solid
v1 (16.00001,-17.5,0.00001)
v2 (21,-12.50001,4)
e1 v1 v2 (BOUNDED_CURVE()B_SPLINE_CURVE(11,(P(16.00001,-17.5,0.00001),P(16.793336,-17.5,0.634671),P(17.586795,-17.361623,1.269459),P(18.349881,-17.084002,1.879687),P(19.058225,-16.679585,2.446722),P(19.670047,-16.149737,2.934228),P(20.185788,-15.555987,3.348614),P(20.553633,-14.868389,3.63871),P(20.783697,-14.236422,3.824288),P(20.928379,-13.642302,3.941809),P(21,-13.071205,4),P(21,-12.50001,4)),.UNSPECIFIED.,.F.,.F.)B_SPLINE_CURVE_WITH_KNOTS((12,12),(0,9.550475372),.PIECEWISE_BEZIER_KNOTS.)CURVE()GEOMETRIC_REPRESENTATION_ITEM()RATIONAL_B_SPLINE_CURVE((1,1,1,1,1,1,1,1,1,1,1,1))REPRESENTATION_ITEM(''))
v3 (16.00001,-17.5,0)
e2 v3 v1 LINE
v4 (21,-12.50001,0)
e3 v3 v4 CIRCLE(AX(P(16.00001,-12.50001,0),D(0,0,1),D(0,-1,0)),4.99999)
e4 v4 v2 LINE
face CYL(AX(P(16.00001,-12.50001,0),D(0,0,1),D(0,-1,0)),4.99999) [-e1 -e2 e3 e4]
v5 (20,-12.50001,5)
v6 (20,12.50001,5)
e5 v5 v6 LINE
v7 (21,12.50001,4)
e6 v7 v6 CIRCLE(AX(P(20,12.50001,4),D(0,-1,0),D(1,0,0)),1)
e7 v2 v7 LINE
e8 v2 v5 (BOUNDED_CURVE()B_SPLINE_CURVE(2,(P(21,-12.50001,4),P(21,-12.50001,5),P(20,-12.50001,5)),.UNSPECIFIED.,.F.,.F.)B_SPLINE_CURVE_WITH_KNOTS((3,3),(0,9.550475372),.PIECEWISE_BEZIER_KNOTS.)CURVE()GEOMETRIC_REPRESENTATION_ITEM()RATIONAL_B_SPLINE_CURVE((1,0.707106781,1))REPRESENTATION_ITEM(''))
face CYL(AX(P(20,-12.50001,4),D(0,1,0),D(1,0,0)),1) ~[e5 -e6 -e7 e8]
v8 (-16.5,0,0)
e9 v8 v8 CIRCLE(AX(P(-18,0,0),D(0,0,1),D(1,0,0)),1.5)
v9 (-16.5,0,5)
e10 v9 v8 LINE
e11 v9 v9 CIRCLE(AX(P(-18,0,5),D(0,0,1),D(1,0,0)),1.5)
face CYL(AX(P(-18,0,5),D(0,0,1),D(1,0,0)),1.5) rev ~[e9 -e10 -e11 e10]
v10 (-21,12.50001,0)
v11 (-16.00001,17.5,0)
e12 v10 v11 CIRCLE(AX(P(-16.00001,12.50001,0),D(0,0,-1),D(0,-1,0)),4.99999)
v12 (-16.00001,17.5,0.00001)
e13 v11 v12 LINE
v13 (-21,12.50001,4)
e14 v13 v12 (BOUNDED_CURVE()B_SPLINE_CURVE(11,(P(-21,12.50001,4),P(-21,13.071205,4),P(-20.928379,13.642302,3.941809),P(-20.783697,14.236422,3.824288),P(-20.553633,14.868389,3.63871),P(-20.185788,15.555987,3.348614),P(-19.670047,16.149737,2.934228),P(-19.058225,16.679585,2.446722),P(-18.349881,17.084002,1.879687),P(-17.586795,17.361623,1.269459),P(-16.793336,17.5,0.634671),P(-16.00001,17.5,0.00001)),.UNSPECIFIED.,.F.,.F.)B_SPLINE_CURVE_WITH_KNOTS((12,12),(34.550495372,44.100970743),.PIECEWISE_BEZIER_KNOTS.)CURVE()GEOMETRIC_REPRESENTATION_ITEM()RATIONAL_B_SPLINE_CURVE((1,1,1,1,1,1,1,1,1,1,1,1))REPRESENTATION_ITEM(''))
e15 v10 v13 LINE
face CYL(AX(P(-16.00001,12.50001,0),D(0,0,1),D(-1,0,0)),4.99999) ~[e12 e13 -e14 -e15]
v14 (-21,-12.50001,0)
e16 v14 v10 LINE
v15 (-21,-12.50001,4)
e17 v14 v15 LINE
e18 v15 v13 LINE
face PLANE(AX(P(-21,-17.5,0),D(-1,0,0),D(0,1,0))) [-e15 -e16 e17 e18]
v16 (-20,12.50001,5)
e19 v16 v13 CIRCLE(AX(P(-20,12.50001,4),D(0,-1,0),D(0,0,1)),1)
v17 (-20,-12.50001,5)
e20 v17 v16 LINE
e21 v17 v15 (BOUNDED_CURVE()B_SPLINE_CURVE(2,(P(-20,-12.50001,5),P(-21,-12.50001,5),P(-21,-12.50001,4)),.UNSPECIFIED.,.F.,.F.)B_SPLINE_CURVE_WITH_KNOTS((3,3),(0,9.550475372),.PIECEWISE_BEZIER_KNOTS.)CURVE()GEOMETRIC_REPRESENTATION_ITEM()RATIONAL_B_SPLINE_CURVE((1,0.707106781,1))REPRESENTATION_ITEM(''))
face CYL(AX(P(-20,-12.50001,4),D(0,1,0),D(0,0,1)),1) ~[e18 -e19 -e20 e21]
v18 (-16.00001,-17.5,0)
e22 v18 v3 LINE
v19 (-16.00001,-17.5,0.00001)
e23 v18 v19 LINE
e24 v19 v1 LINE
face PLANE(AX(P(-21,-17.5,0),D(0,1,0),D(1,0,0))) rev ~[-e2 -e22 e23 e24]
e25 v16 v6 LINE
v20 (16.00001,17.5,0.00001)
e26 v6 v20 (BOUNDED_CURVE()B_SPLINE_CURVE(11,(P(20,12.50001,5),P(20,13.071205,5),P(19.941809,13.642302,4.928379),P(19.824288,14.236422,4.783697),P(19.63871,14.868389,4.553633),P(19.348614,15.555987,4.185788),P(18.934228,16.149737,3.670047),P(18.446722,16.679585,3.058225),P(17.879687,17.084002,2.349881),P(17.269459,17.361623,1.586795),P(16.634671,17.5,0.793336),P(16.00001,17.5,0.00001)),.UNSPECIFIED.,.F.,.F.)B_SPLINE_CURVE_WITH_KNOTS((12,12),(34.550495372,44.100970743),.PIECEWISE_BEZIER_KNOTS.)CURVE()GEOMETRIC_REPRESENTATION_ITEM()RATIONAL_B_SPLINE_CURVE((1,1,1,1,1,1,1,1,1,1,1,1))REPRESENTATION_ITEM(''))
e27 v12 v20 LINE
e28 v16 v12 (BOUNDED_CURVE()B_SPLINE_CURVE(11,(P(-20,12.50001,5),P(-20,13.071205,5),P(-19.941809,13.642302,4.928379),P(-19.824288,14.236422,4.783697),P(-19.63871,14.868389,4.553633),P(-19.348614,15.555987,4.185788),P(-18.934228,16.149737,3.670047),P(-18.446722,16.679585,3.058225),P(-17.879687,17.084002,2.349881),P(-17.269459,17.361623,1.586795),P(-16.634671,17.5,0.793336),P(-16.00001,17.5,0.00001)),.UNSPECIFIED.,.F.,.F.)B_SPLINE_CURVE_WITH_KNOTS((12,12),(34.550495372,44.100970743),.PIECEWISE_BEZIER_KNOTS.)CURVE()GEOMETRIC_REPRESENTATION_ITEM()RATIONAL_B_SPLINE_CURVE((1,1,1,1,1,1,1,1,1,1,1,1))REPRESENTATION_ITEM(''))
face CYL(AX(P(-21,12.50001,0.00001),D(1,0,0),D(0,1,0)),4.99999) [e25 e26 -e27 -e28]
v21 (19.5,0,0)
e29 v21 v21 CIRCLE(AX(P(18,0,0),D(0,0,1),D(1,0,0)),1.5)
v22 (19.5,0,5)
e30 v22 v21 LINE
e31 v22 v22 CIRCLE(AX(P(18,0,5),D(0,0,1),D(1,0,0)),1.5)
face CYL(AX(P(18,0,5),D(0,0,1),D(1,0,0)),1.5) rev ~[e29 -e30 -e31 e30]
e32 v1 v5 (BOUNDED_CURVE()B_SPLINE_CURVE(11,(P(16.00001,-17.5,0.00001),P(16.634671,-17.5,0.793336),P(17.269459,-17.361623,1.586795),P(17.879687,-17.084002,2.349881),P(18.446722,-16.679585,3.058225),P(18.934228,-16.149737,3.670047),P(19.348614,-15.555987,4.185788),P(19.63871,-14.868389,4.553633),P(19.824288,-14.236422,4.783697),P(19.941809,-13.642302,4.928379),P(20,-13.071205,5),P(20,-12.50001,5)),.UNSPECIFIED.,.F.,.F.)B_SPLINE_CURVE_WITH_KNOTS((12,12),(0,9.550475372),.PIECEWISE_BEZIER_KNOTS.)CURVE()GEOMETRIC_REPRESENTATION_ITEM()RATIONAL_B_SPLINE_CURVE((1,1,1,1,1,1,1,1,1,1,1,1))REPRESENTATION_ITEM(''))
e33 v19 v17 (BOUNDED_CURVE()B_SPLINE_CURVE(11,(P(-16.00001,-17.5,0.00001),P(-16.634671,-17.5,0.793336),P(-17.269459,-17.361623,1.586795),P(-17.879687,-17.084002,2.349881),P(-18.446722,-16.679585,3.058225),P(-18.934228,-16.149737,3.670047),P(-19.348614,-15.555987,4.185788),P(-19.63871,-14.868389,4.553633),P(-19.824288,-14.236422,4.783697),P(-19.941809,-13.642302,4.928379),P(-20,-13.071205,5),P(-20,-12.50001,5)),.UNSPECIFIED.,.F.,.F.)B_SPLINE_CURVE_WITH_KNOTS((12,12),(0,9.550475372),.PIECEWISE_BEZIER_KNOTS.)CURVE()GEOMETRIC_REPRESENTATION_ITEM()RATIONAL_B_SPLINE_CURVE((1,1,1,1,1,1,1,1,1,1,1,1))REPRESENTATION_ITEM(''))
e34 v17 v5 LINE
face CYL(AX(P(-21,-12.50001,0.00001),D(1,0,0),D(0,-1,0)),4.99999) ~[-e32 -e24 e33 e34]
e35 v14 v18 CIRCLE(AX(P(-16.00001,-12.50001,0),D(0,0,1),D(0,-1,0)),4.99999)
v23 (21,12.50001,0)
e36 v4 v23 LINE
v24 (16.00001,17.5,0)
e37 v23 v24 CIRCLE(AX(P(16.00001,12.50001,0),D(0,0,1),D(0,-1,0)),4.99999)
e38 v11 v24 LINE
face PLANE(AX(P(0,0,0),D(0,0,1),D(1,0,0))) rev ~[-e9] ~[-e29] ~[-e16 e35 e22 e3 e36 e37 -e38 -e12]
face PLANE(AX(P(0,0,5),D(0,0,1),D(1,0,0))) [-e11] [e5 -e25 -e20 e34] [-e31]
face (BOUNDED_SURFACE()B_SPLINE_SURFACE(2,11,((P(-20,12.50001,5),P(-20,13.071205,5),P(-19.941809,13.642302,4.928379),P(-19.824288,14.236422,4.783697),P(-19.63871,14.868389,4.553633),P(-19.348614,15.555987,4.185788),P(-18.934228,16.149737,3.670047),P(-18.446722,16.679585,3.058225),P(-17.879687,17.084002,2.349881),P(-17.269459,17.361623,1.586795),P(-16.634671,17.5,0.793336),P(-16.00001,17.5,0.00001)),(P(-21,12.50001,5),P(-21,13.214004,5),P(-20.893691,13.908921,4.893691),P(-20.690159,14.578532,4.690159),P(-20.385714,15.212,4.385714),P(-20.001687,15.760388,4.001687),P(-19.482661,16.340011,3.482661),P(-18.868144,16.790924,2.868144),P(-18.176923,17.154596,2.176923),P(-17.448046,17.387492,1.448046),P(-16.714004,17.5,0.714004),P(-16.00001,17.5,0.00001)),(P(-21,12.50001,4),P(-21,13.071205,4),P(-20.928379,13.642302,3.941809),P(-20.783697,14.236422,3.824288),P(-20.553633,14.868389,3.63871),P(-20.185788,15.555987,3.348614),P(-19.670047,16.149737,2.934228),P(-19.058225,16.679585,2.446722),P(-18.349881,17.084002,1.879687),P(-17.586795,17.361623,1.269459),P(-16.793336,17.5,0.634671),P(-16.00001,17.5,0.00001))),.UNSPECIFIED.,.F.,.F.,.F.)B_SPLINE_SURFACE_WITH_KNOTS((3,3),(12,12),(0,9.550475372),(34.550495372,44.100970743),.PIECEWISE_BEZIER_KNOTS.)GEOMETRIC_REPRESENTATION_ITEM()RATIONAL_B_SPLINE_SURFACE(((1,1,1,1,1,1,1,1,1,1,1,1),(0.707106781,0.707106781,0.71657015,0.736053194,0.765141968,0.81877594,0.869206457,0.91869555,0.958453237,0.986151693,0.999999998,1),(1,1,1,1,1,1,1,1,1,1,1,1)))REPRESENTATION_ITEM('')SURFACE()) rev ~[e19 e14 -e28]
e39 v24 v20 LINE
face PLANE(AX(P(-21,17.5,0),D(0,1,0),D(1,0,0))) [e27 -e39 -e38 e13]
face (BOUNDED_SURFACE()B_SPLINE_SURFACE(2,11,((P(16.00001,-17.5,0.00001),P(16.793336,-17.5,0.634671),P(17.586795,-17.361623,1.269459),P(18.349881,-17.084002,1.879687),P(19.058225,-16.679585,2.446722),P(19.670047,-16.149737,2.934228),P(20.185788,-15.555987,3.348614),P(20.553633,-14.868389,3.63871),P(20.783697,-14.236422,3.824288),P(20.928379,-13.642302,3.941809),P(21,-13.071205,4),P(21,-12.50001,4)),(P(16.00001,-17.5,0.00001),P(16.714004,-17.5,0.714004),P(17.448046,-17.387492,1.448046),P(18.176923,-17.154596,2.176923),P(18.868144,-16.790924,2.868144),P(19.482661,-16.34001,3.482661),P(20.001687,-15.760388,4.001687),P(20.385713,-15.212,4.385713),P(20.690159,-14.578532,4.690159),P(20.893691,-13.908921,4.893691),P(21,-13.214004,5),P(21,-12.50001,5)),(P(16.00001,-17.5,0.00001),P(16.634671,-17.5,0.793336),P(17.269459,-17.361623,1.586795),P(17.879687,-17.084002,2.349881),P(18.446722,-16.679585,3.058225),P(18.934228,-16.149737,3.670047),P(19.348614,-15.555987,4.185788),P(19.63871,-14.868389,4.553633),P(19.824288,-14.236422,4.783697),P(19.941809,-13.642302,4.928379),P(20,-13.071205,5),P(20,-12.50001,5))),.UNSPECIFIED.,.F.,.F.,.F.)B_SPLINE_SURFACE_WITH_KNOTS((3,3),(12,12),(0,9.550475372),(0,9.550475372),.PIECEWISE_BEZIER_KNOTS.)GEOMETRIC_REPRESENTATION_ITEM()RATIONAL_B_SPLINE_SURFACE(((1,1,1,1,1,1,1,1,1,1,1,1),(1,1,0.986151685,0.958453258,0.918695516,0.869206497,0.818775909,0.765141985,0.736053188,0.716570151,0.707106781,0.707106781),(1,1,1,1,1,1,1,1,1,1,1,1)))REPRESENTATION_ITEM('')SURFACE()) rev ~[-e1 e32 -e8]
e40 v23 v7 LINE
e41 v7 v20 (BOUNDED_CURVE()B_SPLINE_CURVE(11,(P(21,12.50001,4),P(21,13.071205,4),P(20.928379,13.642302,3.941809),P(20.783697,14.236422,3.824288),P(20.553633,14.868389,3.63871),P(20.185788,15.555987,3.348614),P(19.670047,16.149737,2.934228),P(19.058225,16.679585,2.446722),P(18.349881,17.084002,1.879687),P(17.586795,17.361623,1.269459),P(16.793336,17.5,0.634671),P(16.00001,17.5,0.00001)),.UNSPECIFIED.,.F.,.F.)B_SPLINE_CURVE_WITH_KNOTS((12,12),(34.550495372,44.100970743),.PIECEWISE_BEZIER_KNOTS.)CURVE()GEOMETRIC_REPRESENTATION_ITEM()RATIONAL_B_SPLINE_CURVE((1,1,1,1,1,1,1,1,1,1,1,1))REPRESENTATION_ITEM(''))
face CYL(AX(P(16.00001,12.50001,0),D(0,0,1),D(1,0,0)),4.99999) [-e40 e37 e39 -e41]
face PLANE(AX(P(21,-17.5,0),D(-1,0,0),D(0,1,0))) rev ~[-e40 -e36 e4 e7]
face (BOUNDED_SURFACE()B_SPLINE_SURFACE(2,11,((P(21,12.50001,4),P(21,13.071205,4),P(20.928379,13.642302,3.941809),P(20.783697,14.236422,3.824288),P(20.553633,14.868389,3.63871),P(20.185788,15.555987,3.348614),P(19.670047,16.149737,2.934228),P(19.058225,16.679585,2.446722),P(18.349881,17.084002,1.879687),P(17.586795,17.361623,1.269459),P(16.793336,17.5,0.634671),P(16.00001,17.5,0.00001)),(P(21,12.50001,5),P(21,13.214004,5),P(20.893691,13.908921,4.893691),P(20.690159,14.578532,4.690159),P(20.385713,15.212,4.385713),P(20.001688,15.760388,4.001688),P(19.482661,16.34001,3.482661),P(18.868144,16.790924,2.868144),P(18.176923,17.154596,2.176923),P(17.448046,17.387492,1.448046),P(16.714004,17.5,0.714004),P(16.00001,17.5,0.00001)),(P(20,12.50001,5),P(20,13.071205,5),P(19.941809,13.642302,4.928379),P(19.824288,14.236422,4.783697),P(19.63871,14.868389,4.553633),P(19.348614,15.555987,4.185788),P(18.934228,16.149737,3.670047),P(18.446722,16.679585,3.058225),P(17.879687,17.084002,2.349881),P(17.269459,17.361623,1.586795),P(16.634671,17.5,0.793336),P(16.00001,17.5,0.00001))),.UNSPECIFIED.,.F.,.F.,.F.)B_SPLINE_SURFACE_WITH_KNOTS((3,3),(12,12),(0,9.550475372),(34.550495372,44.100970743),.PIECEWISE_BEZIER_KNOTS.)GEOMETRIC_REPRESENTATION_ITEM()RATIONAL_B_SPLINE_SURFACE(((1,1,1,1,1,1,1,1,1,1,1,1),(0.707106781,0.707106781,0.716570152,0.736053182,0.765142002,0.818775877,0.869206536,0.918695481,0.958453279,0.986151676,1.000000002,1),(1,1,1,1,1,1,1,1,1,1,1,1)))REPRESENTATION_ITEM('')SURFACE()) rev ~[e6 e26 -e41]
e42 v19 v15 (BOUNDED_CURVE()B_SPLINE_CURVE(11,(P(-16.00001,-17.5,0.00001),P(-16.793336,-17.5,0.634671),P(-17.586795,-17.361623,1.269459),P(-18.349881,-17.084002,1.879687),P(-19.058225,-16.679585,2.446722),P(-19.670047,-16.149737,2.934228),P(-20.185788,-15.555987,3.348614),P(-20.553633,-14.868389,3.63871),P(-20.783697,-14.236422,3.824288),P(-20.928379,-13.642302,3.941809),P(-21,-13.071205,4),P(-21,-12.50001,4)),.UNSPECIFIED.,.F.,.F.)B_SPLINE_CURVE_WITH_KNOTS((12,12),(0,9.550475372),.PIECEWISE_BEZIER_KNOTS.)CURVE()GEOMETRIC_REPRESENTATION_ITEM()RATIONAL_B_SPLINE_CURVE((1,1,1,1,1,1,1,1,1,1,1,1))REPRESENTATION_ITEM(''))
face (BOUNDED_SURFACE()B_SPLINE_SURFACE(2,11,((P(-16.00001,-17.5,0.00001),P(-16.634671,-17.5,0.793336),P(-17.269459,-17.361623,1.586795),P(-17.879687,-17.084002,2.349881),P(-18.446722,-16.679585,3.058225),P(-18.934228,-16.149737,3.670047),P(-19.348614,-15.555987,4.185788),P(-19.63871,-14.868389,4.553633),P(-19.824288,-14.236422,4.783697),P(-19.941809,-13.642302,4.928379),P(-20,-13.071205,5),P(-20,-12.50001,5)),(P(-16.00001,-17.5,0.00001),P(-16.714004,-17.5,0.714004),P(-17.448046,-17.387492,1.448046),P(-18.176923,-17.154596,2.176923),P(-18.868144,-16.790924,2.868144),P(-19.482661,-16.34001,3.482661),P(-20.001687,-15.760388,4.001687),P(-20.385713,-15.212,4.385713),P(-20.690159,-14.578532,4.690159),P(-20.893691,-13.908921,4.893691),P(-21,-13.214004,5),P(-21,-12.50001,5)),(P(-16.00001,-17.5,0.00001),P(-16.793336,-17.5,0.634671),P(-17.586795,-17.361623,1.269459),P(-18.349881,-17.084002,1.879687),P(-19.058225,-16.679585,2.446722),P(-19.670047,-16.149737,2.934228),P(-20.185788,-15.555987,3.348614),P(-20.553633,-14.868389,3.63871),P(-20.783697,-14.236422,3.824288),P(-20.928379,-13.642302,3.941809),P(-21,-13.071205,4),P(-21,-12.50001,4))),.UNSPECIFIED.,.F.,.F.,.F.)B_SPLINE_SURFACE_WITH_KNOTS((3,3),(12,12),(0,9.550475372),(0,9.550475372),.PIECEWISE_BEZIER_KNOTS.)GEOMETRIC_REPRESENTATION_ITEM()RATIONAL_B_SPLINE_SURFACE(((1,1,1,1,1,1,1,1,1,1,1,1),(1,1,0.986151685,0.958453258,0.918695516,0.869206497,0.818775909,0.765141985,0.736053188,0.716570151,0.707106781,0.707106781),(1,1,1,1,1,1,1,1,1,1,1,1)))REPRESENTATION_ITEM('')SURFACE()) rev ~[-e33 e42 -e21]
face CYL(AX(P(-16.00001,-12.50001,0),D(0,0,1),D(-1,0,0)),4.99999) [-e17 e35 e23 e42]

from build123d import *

# Parameters (mm, degrees)
F0_W     = 42
F0_H     = 35
F1_DEPTH = 5
F2_R     = 4.99999
F3_R     = 1.5
F4_DEPTH = 6
F5_F1_R  = 1
F5_F2_R  = 1


# Not quite as in the source:
# - a fillet or chamfer is up to 0.001 mm smaller than in the source, because OpenCascade refuses the exact size


with BuildPart() as f1:
    # F0 (on Top) → F1 (new body)
    with BuildSketch(Plane.XY):
        Rectangle(F0_W, F0_H)
    extrude(amount=F1_DEPTH)

    # F2 (radius 5 in the source; OpenCascade refuses exactly that, so slightly less here)
    f2_edges = [f1.edges().sort_by_distance(p)[0] for p in [
        (-21, -17.5, 2.5),
        (21, -17.5, 2.5),
        (-21, 17.5, 2.5),
        (21, 17.5, 2.5),
        (0, 17.5, 5),
        (0, -17.5, 5),
    ]]
    fillet(f2_edges, radius=F2_R)

    # F3 (on face) → F4 (cut)
    with BuildSketch(Plane.XY.offset(5)):
        with Locations((-18, 0)):
            Circle(F3_R)
        with Locations((18, 0)):
            Circle(F3_R)
    extrude(amount=-F4_DEPTH, mode=Mode.SUBTRACT)

    # F5: fillet of radius 1 on 2 edges, made by hand

    # F5_f1
    f5_f1_edges = [f1.edges().sort_by_distance(p)[0] for p in [
        (19.5355368349, 16.0355368349, 3.5355368349),
        (21, 0, 5),
        (19.5355368349, -16.0355368349, 3.5355368349),
    ]]
    fillet(f5_f1_edges, radius=F5_F1_R)

    # F5_f2
    f5_f2_edges = [f1.edges().sort_by_distance(p)[0] for p in [
        (-19.5355368349, 16.0355368349, 3.5355368349),
        (-21, 0, 5),
        (-19.5355368349, -16.0355368349, 3.5355368349),
    ]]
    fillet(f5_f2_edges, radius=F5_F2_R)


solid = f1.part
